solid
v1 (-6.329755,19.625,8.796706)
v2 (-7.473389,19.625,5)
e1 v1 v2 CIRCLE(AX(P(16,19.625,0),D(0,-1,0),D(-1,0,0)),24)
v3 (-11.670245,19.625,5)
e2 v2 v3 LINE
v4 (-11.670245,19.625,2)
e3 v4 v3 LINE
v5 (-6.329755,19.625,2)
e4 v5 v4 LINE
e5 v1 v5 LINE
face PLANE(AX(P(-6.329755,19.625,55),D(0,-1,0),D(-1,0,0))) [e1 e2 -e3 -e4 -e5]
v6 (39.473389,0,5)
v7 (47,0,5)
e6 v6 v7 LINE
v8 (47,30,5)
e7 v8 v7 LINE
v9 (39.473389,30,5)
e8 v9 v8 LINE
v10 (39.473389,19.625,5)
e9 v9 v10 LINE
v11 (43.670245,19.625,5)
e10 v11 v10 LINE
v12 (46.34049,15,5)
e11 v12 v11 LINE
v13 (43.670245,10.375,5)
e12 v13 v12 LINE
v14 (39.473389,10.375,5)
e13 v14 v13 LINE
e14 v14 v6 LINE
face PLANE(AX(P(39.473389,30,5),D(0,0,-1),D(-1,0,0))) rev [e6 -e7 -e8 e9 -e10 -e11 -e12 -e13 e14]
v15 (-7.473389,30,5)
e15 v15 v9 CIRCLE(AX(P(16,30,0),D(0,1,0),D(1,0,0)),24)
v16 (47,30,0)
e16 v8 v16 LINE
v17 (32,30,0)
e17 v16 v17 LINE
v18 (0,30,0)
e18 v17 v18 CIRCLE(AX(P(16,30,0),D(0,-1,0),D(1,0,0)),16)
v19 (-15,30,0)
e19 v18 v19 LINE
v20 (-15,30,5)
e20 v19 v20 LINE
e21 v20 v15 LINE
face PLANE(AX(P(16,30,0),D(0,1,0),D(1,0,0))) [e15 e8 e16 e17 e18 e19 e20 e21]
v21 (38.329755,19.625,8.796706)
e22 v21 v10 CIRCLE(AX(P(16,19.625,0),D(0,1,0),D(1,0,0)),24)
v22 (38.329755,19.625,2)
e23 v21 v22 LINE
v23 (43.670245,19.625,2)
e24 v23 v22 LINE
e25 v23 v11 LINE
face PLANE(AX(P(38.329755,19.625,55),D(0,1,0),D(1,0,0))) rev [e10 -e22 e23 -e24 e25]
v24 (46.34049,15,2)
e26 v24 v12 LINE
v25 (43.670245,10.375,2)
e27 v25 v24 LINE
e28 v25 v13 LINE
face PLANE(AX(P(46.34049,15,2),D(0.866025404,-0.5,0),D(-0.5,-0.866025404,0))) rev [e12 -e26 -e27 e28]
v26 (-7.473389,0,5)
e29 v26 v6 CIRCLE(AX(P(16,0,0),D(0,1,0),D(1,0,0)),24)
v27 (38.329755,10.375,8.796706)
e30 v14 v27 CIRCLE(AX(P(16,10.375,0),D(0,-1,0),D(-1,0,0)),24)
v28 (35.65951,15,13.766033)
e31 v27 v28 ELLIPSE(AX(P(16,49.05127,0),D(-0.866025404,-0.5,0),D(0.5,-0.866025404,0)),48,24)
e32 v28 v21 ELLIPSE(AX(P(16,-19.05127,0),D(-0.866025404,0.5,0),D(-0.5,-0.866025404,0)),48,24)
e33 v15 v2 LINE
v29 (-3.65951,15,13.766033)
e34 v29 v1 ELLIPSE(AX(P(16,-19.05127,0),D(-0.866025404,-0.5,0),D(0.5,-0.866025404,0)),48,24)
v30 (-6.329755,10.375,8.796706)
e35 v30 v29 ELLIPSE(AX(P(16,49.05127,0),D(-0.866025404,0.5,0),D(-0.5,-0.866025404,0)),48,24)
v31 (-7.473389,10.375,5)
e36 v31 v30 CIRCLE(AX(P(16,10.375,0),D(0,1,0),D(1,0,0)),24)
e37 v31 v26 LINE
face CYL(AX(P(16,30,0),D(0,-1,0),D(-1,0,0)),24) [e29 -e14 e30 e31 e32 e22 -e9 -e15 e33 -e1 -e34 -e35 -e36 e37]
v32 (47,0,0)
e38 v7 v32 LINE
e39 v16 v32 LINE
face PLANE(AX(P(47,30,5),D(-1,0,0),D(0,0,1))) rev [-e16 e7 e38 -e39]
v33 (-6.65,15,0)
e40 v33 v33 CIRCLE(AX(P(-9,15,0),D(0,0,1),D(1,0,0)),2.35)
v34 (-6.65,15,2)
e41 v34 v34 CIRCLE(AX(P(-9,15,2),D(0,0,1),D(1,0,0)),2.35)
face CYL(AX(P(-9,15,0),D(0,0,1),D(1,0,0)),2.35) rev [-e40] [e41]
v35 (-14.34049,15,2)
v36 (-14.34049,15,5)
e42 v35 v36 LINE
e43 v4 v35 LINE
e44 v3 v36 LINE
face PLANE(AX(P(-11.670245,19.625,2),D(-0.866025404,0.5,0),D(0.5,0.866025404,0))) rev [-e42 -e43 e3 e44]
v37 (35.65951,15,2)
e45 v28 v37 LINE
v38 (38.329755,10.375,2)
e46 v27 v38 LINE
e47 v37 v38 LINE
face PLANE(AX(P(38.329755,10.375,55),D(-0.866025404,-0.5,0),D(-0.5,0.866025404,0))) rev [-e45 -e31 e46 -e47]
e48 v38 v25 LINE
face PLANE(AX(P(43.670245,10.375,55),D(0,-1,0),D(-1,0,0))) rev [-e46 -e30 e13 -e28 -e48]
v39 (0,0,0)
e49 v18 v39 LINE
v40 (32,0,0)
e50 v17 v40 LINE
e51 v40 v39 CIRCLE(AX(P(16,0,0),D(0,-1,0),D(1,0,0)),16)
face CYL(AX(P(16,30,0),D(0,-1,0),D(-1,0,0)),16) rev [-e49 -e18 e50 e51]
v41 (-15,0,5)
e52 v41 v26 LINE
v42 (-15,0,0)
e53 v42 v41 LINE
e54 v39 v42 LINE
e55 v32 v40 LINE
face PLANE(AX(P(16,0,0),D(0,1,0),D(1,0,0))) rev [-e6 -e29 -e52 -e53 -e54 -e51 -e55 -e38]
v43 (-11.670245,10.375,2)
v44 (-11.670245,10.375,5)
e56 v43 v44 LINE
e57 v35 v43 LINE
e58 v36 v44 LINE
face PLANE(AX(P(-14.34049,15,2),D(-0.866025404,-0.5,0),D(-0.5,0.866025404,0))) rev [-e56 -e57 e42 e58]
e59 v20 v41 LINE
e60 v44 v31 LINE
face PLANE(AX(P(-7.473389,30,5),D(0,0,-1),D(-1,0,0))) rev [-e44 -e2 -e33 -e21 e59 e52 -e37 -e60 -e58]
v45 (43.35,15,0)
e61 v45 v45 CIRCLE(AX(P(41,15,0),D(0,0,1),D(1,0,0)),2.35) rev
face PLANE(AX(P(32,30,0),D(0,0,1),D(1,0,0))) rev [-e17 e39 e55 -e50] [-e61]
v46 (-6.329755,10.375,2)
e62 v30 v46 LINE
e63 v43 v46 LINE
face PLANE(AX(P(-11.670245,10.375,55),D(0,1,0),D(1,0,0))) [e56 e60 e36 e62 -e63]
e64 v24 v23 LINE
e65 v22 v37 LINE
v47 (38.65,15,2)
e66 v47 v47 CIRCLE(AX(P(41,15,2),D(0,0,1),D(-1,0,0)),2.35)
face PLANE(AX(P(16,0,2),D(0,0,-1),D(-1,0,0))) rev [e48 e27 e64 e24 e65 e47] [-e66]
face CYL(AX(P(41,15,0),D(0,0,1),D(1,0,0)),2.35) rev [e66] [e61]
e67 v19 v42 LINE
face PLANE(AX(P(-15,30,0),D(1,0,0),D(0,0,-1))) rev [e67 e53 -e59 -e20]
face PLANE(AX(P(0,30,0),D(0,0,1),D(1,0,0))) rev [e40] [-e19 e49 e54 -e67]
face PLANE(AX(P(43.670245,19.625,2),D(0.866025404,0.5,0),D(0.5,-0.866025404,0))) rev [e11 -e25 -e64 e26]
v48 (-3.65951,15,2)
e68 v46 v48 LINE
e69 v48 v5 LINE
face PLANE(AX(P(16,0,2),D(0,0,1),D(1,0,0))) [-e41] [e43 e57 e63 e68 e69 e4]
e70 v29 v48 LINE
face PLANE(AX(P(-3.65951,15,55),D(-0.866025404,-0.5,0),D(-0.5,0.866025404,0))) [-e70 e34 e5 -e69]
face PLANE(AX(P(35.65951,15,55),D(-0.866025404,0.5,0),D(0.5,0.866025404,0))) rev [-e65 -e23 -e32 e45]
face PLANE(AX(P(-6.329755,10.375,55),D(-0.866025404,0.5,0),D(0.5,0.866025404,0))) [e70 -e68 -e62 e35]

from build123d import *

# Parameters (mm, degrees)
BOSS_EXTRUDE1_DEPTH   = 30
CUT_EXTRUDE1_DEPTH    = 50
SKETCH2_7_R           = 2.35
CUT_EXTRUDE5_DEPTH    = 5
SKETCH2_10_R          = 2.35
CUT_EXTRUDE8_DEPTH    = 3
BODY_MOVE_COPY1_ANGLE = 90


with BuildPart() as part:
    # Sketch1 → Boss-Extrude1 (new body)
    with BuildSketch(Plane(origin=(0, 0, 0), x_dir=(1, 0, 0), z_dir=(0, 1, 0))):
        with BuildLine():
            Line((0, -16), (0, -31))
            Line((0, -31), (-5, -31))
            Line((-5, -31), (-5, -23.473389189))
            ThreePointArc((-5, -23.473389189), (-24, 0), (-5, 23.473389189))
            Line((-5, 23.473389189), (-5, 31))
            Line((-5, 31), (0, 31))
            Line((0, 31), (0, 16))
            ThreePointArc((0, 16), (-16, 0), (0, -16))
        make_face()
    extrude(amount=BOSS_EXTRUDE1_DEPTH)

    # Sketch2 → Cut-Extrude1 (cut)
    with BuildSketch(Plane.ZY.offset(5)):
        Polygon((-23.473389189, 10.375), (-22.329755005, 10.375), (-19.65951001, 15), (-22.329755005, 19.625), (-23.473389189, 19.625), align=None)
        Polygon((23.473389189, 19.625), (22.329755005, 19.625), (19.65951001, 15), (22.329755005, 10.375), (23.473389189, 10.375), align=None)
    extrude(amount=CUT_EXTRUDE1_DEPTH, mode=Mode.SUBTRACT)

    # Sketch2<7> → Cut-Extrude5 (cut)
    with BuildSketch(Plane.ZY.offset(5)):
        with Locations((-25, 15)):
            Circle(SKETCH2_7_R)
        with Locations((25, 15)):
            Circle(SKETCH2_7_R)
    extrude(amount=-CUT_EXTRUDE5_DEPTH, mode=Mode.SUBTRACT)

    # Sketch2<10> → Cut-Extrude8 (cut)
    # profile 1 of 2: a face of its own
    with BuildSketch(Plane.ZY.offset(5)):
        Polygon((-22.329755005, 10.375), (-19.65951001, 15), (-22.329755005, 19.625), (-27.670244995, 19.625), (-30.34048999, 15), (-27.670244995, 10.375), align=None)
        with Locations((-25, 15)):
            Circle(SKETCH2_10_R, mode=Mode.SUBTRACT)
    # profile 2 of 2: a face of its own
    with BuildSketch(Plane.ZY.offset(5)):
        Polygon((27.670244995, 19.625), (30.34048999, 15), (27.670244995, 10.375), (22.329755005, 10.375), (19.65951001, 15), (22.329755005, 19.625), align=None)
        with Locations((25, 15)):
            Circle(SKETCH2_10_R, mode=Mode.SUBTRACT)
    extrude(amount=-CUT_EXTRUDE8_DEPTH, mode=Mode.SUBTRACT)


with BuildPart() as part_1:
    # Body-Move/Copy1: read off the stored shape, not the designer's step
    # Body-Move/Copy1: moved
    add(part.part.moved(Location((0, 0, 16))).rotate(Axis((0, 0, 0), (0, 1, 0)), BODY_MOVE_COPY1_ANGLE))


solid = part_1.part
